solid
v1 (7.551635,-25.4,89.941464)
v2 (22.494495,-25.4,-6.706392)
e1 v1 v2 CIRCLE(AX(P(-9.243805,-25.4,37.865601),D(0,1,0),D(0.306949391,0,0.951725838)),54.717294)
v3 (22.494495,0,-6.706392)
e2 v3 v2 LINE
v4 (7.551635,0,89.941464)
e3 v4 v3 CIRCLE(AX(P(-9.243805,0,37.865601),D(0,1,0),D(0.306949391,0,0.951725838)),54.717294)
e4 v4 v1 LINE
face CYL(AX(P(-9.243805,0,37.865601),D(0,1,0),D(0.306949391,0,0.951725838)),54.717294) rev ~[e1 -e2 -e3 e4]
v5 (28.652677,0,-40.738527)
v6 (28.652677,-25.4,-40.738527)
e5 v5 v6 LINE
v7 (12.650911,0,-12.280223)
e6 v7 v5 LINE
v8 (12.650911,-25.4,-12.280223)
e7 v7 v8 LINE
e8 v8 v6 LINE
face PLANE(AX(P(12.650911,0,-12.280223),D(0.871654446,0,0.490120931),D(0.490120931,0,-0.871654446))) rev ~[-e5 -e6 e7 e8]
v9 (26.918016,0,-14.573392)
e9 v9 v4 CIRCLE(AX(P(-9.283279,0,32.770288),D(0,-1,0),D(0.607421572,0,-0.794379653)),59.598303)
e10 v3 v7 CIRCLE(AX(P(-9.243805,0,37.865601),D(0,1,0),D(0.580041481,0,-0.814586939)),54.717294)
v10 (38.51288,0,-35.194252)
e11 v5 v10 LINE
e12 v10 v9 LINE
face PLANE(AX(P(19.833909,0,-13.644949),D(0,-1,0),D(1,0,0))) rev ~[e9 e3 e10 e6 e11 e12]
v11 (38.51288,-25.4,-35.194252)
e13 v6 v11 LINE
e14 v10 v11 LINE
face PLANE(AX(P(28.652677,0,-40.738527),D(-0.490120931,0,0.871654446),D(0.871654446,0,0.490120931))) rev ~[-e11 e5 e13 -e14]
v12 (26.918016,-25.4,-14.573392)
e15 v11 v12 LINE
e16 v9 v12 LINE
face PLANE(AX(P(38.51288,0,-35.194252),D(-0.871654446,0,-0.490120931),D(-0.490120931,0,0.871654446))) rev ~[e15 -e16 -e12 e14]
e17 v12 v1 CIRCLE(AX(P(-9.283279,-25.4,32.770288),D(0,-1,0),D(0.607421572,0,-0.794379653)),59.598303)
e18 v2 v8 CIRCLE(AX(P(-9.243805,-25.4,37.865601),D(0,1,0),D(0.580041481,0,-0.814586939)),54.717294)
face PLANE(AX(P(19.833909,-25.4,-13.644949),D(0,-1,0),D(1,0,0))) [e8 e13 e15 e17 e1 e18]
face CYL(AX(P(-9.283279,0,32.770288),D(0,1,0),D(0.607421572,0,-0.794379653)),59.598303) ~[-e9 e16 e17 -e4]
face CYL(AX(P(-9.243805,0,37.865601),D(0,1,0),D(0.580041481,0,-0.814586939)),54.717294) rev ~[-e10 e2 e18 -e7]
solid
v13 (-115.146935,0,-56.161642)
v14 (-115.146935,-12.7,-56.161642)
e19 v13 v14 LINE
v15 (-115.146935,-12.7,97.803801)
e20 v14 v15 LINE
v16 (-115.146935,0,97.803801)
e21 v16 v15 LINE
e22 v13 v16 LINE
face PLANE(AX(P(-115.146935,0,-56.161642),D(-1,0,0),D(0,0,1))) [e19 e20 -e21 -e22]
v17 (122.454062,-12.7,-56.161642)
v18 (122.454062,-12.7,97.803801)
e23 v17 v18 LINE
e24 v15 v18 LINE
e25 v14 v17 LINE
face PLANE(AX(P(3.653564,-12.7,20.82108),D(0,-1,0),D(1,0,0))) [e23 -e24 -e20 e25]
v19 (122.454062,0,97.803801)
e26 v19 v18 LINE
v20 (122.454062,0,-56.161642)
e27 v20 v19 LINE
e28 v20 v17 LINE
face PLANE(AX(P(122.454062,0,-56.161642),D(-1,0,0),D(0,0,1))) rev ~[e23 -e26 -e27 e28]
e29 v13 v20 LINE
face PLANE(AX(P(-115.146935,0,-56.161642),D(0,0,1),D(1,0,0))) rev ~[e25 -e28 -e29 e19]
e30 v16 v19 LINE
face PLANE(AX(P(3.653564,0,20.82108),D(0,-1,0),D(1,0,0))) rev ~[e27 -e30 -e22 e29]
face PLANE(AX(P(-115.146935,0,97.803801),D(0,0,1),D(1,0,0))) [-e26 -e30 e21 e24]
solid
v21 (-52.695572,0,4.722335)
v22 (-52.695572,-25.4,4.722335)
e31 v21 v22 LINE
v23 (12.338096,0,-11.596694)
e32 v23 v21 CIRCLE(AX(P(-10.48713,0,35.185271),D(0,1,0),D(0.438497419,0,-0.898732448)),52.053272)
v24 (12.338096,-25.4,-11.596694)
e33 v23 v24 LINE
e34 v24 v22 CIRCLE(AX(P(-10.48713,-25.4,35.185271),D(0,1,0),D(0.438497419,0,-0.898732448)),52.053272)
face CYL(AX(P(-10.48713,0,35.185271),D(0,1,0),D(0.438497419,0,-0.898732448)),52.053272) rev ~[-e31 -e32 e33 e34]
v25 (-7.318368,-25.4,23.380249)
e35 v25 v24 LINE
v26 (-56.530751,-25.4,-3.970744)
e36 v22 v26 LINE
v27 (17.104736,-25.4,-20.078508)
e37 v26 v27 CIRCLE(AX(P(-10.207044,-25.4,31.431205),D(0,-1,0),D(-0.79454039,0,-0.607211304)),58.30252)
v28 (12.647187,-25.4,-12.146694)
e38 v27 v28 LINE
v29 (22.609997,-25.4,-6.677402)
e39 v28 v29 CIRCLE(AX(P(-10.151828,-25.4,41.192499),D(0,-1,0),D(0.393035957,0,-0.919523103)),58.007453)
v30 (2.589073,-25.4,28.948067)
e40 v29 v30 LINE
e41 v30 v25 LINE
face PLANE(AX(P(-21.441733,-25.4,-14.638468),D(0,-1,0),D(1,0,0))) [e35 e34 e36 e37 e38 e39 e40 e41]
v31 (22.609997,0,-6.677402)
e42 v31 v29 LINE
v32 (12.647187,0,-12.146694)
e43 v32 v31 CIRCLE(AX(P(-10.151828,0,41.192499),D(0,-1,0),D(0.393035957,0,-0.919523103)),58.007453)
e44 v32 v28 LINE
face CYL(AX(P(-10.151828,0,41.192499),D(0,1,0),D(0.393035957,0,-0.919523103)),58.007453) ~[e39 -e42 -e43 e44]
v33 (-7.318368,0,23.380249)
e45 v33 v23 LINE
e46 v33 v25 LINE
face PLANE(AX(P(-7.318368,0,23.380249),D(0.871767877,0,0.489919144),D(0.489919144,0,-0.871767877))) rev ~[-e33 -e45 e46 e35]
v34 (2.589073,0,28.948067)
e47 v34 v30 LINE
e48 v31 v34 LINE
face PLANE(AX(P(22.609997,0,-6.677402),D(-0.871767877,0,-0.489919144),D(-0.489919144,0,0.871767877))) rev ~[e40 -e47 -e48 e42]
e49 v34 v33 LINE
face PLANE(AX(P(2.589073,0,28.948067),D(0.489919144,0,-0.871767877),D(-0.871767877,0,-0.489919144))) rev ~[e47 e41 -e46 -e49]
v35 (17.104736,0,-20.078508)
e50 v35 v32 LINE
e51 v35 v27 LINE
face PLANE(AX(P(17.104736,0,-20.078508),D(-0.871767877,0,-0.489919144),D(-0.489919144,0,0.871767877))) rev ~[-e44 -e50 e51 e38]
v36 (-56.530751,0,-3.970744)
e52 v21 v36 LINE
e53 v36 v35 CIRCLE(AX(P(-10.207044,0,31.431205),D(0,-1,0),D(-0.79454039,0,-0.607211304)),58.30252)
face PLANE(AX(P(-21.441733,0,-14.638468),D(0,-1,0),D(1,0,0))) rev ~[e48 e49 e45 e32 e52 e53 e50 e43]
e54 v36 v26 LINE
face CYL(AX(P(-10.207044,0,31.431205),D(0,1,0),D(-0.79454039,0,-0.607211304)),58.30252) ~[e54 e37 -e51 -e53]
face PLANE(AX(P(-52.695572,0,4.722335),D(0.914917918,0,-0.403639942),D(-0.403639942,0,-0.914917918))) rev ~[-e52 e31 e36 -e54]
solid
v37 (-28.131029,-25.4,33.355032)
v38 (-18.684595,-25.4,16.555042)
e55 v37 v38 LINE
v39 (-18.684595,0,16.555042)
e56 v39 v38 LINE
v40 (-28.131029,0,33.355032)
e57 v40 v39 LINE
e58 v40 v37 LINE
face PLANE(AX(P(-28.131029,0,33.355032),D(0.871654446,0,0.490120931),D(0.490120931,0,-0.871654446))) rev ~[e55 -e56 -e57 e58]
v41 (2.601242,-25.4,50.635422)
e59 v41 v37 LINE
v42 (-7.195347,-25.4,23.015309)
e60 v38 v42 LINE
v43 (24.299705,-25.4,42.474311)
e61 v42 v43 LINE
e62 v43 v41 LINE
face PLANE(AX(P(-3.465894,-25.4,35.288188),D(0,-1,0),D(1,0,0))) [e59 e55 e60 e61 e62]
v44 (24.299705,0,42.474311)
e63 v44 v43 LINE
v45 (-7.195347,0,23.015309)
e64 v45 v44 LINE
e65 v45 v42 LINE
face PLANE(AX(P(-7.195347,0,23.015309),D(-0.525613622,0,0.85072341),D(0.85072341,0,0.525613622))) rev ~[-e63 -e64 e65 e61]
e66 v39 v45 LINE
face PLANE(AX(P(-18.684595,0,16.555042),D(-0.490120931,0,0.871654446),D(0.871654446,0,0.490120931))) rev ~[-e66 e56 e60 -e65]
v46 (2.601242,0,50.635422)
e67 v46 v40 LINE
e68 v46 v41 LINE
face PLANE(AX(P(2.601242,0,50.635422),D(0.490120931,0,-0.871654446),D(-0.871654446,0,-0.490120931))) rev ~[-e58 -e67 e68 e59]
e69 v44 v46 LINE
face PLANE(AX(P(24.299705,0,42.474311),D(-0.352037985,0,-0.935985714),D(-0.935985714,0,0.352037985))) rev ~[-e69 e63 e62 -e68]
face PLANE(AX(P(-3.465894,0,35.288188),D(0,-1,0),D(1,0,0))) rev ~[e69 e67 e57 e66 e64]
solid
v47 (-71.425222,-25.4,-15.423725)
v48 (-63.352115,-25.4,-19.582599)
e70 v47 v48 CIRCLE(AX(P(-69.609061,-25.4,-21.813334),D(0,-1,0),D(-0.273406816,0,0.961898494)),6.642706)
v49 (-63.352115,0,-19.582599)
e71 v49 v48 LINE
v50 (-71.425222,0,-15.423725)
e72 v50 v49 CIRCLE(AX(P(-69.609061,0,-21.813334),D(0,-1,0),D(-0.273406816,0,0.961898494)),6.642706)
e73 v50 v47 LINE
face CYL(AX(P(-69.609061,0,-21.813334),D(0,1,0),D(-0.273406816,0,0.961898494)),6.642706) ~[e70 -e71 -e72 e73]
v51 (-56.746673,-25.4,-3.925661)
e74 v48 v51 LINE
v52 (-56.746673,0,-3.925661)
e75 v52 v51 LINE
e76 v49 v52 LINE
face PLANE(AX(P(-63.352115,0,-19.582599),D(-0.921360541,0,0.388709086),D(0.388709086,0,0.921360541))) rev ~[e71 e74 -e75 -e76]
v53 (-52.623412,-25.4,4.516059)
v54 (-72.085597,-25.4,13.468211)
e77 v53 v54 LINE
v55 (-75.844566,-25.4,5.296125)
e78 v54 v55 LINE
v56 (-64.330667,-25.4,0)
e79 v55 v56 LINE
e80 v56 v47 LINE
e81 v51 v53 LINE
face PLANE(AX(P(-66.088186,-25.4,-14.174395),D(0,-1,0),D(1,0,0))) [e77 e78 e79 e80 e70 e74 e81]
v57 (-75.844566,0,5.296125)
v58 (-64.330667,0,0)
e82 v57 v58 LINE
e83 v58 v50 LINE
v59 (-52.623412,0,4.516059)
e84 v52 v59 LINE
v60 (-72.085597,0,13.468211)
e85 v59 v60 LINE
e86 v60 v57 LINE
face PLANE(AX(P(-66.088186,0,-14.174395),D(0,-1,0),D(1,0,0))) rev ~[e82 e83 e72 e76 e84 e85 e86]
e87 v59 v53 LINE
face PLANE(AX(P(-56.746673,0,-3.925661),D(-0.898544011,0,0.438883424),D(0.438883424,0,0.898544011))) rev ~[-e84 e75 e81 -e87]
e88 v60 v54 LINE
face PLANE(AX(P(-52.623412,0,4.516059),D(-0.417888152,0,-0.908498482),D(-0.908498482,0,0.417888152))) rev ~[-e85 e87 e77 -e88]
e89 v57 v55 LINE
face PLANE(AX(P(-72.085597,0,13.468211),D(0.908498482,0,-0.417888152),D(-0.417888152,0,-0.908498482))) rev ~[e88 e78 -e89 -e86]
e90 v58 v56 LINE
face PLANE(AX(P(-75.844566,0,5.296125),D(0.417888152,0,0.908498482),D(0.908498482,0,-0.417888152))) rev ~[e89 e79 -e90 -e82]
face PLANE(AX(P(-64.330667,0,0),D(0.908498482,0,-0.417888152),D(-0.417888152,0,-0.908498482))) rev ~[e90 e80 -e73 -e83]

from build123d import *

# Parameters (mm, degrees)
F2_DEPTH = 25.4
F3_W     = 237.6009970903
F3_H     = 153.9654433727
F4_DEPTH = 12.7


with BuildPart() as f2:
    # F0 (on Front) → F2 (new body)
    with BuildSketch(Plane.XZ):
        with BuildLine():
            Line((-64.3306672573, 0), (-71.4252218604, -15.4237253591))
            ThreePointArc((-71.4252218604, -15.4237253591), (-72.6511323462, -27.7185305075), (-63.3521154523, -19.5825994015))
            Line((-63.3521154523, -19.5825994015), (-56.7466728389, -3.9256610908))
            Line((-56.7466728389, -3.9256610908), (-64.3306672573, 0))
        make_face()
        Polygon((-75.8445660615, 5.296125408), (-64.3306672573, 0), (-56.7466728389, -3.9256610908), (-52.6234121387, 4.5160594285), (-72.0855967984, 13.4682112951), align=None)
    extrude(amount=F2_DEPTH)


with BuildPart() as f2b:
    # F0 (on Front) → F2, piece 2 (new body)
    with BuildSketch(Plane.XZ):
        Polygon((-18.6845945711, 16.555041561), (-7.1953465231, 23.0153091252), (24.2997054011, 42.4743108451), (2.6012415412, 50.6354220424), (-28.1310292188, 33.355031617), align=None)
    extrude(amount=F2_DEPTH)


with BuildPart() as f2c:
    # F0 (on Front) → F2, piece 3 (new body)
    with BuildSketch(Plane.XZ):
        with BuildLine():
            ThreePointArc((22.4944953294, -6.7063916159), (17.7171299982, -9.748369789), (12.6509112915, -12.2802226143))
            Line((12.6509112915, -12.2802226143), (17.3099082645, -20.5660051064))
            ThreePointArc((17.3099082645, -20.5660051064), (22.2566100758, -17.7984094918), (26.9180159505, -14.5733917296))
            Line((26.9180159505, -14.5733917296), (22.4944953294, -6.7063916159))
        make_face()
        with BuildLine():
            ThreePointArc((7.5516351178, 89.9414640887), (44.8309857608, 46.2261805414), (22.4944953294, -6.7063916159))
            Line((22.4944953294, -6.7063916159), (26.9180159505, -14.5733917296))
            ThreePointArc((26.9180159505, -14.5733917296), (49.3174772695, 43.6288834146), (7.5516351178, 89.9414640887))
        make_face()
        with BuildLine():
            ThreePointArc((26.9180159505, -14.5733917296), (22.2566100758, -17.7984094918), (17.3099082645, -20.5660051064))
            Line((17.3099082645, -20.5660051064), (28.6526773125, -40.7385267317))
            Line((28.6526773125, -40.7385267317), (38.5128803721, -35.1942517944))
            Line((38.5128803721, -35.1942517944), (26.9180159505, -14.5733917296))
        make_face()
    extrude(amount=F2_DEPTH)


with BuildPart() as f2d:
    # F1 (on Front) → F2, piece 4 (new body)
    with BuildSketch(Plane.XZ):
        with BuildLine():
            Line((-52.6955723763, 4.7223349102), (-56.5307512879, -3.9707440883))
            ThreePointArc((-56.5307512879, -3.9707440883), (-22.6661115444, -25.5245276399), (17.104735598, -20.0785081834))
            Line((17.104735598, -20.0785081834), (12.6471872308, -12.1466942847))
            Line((12.6471872308, -12.1466942847), (12.3380959022, -11.5966935457))
            ThreePointArc((12.3380959022, -11.5966935457), (-23.156184417, -15.3027292619), (-52.6955723763, 4.7223349102))
        make_face()
        with BuildLine():
            Line((12.3380959022, -11.5966935457), (12.6471872308, -12.1466942847))
            ThreePointArc((12.6471872308, -12.1466942847), (17.7628642759, -9.6566366334), (22.6099974974, -6.6774021226))
            Line((22.6099974974, -6.6774021226), (2.5890725665, 28.9480667561))
            Line((2.5890725665, 28.9480667561), (-7.3183678898, 23.3802489035))
            Line((-7.3183678898, 23.3802489035), (12.3380959022, -11.5966935457))
        make_face()
    extrude(amount=F2_DEPTH)


with BuildPart() as f4:
    # F3 (on Front) → F4 (new body)
    with BuildSketch(Plane.XZ):
        with Locations((3.6535635591, 20.8210796118)):
            Rectangle(F3_W, F3_H)
    extrude(amount=F4_DEPTH)


solid = Compound([f2.part, f2b.part, f2c.part, f2d.part, f4.part])
